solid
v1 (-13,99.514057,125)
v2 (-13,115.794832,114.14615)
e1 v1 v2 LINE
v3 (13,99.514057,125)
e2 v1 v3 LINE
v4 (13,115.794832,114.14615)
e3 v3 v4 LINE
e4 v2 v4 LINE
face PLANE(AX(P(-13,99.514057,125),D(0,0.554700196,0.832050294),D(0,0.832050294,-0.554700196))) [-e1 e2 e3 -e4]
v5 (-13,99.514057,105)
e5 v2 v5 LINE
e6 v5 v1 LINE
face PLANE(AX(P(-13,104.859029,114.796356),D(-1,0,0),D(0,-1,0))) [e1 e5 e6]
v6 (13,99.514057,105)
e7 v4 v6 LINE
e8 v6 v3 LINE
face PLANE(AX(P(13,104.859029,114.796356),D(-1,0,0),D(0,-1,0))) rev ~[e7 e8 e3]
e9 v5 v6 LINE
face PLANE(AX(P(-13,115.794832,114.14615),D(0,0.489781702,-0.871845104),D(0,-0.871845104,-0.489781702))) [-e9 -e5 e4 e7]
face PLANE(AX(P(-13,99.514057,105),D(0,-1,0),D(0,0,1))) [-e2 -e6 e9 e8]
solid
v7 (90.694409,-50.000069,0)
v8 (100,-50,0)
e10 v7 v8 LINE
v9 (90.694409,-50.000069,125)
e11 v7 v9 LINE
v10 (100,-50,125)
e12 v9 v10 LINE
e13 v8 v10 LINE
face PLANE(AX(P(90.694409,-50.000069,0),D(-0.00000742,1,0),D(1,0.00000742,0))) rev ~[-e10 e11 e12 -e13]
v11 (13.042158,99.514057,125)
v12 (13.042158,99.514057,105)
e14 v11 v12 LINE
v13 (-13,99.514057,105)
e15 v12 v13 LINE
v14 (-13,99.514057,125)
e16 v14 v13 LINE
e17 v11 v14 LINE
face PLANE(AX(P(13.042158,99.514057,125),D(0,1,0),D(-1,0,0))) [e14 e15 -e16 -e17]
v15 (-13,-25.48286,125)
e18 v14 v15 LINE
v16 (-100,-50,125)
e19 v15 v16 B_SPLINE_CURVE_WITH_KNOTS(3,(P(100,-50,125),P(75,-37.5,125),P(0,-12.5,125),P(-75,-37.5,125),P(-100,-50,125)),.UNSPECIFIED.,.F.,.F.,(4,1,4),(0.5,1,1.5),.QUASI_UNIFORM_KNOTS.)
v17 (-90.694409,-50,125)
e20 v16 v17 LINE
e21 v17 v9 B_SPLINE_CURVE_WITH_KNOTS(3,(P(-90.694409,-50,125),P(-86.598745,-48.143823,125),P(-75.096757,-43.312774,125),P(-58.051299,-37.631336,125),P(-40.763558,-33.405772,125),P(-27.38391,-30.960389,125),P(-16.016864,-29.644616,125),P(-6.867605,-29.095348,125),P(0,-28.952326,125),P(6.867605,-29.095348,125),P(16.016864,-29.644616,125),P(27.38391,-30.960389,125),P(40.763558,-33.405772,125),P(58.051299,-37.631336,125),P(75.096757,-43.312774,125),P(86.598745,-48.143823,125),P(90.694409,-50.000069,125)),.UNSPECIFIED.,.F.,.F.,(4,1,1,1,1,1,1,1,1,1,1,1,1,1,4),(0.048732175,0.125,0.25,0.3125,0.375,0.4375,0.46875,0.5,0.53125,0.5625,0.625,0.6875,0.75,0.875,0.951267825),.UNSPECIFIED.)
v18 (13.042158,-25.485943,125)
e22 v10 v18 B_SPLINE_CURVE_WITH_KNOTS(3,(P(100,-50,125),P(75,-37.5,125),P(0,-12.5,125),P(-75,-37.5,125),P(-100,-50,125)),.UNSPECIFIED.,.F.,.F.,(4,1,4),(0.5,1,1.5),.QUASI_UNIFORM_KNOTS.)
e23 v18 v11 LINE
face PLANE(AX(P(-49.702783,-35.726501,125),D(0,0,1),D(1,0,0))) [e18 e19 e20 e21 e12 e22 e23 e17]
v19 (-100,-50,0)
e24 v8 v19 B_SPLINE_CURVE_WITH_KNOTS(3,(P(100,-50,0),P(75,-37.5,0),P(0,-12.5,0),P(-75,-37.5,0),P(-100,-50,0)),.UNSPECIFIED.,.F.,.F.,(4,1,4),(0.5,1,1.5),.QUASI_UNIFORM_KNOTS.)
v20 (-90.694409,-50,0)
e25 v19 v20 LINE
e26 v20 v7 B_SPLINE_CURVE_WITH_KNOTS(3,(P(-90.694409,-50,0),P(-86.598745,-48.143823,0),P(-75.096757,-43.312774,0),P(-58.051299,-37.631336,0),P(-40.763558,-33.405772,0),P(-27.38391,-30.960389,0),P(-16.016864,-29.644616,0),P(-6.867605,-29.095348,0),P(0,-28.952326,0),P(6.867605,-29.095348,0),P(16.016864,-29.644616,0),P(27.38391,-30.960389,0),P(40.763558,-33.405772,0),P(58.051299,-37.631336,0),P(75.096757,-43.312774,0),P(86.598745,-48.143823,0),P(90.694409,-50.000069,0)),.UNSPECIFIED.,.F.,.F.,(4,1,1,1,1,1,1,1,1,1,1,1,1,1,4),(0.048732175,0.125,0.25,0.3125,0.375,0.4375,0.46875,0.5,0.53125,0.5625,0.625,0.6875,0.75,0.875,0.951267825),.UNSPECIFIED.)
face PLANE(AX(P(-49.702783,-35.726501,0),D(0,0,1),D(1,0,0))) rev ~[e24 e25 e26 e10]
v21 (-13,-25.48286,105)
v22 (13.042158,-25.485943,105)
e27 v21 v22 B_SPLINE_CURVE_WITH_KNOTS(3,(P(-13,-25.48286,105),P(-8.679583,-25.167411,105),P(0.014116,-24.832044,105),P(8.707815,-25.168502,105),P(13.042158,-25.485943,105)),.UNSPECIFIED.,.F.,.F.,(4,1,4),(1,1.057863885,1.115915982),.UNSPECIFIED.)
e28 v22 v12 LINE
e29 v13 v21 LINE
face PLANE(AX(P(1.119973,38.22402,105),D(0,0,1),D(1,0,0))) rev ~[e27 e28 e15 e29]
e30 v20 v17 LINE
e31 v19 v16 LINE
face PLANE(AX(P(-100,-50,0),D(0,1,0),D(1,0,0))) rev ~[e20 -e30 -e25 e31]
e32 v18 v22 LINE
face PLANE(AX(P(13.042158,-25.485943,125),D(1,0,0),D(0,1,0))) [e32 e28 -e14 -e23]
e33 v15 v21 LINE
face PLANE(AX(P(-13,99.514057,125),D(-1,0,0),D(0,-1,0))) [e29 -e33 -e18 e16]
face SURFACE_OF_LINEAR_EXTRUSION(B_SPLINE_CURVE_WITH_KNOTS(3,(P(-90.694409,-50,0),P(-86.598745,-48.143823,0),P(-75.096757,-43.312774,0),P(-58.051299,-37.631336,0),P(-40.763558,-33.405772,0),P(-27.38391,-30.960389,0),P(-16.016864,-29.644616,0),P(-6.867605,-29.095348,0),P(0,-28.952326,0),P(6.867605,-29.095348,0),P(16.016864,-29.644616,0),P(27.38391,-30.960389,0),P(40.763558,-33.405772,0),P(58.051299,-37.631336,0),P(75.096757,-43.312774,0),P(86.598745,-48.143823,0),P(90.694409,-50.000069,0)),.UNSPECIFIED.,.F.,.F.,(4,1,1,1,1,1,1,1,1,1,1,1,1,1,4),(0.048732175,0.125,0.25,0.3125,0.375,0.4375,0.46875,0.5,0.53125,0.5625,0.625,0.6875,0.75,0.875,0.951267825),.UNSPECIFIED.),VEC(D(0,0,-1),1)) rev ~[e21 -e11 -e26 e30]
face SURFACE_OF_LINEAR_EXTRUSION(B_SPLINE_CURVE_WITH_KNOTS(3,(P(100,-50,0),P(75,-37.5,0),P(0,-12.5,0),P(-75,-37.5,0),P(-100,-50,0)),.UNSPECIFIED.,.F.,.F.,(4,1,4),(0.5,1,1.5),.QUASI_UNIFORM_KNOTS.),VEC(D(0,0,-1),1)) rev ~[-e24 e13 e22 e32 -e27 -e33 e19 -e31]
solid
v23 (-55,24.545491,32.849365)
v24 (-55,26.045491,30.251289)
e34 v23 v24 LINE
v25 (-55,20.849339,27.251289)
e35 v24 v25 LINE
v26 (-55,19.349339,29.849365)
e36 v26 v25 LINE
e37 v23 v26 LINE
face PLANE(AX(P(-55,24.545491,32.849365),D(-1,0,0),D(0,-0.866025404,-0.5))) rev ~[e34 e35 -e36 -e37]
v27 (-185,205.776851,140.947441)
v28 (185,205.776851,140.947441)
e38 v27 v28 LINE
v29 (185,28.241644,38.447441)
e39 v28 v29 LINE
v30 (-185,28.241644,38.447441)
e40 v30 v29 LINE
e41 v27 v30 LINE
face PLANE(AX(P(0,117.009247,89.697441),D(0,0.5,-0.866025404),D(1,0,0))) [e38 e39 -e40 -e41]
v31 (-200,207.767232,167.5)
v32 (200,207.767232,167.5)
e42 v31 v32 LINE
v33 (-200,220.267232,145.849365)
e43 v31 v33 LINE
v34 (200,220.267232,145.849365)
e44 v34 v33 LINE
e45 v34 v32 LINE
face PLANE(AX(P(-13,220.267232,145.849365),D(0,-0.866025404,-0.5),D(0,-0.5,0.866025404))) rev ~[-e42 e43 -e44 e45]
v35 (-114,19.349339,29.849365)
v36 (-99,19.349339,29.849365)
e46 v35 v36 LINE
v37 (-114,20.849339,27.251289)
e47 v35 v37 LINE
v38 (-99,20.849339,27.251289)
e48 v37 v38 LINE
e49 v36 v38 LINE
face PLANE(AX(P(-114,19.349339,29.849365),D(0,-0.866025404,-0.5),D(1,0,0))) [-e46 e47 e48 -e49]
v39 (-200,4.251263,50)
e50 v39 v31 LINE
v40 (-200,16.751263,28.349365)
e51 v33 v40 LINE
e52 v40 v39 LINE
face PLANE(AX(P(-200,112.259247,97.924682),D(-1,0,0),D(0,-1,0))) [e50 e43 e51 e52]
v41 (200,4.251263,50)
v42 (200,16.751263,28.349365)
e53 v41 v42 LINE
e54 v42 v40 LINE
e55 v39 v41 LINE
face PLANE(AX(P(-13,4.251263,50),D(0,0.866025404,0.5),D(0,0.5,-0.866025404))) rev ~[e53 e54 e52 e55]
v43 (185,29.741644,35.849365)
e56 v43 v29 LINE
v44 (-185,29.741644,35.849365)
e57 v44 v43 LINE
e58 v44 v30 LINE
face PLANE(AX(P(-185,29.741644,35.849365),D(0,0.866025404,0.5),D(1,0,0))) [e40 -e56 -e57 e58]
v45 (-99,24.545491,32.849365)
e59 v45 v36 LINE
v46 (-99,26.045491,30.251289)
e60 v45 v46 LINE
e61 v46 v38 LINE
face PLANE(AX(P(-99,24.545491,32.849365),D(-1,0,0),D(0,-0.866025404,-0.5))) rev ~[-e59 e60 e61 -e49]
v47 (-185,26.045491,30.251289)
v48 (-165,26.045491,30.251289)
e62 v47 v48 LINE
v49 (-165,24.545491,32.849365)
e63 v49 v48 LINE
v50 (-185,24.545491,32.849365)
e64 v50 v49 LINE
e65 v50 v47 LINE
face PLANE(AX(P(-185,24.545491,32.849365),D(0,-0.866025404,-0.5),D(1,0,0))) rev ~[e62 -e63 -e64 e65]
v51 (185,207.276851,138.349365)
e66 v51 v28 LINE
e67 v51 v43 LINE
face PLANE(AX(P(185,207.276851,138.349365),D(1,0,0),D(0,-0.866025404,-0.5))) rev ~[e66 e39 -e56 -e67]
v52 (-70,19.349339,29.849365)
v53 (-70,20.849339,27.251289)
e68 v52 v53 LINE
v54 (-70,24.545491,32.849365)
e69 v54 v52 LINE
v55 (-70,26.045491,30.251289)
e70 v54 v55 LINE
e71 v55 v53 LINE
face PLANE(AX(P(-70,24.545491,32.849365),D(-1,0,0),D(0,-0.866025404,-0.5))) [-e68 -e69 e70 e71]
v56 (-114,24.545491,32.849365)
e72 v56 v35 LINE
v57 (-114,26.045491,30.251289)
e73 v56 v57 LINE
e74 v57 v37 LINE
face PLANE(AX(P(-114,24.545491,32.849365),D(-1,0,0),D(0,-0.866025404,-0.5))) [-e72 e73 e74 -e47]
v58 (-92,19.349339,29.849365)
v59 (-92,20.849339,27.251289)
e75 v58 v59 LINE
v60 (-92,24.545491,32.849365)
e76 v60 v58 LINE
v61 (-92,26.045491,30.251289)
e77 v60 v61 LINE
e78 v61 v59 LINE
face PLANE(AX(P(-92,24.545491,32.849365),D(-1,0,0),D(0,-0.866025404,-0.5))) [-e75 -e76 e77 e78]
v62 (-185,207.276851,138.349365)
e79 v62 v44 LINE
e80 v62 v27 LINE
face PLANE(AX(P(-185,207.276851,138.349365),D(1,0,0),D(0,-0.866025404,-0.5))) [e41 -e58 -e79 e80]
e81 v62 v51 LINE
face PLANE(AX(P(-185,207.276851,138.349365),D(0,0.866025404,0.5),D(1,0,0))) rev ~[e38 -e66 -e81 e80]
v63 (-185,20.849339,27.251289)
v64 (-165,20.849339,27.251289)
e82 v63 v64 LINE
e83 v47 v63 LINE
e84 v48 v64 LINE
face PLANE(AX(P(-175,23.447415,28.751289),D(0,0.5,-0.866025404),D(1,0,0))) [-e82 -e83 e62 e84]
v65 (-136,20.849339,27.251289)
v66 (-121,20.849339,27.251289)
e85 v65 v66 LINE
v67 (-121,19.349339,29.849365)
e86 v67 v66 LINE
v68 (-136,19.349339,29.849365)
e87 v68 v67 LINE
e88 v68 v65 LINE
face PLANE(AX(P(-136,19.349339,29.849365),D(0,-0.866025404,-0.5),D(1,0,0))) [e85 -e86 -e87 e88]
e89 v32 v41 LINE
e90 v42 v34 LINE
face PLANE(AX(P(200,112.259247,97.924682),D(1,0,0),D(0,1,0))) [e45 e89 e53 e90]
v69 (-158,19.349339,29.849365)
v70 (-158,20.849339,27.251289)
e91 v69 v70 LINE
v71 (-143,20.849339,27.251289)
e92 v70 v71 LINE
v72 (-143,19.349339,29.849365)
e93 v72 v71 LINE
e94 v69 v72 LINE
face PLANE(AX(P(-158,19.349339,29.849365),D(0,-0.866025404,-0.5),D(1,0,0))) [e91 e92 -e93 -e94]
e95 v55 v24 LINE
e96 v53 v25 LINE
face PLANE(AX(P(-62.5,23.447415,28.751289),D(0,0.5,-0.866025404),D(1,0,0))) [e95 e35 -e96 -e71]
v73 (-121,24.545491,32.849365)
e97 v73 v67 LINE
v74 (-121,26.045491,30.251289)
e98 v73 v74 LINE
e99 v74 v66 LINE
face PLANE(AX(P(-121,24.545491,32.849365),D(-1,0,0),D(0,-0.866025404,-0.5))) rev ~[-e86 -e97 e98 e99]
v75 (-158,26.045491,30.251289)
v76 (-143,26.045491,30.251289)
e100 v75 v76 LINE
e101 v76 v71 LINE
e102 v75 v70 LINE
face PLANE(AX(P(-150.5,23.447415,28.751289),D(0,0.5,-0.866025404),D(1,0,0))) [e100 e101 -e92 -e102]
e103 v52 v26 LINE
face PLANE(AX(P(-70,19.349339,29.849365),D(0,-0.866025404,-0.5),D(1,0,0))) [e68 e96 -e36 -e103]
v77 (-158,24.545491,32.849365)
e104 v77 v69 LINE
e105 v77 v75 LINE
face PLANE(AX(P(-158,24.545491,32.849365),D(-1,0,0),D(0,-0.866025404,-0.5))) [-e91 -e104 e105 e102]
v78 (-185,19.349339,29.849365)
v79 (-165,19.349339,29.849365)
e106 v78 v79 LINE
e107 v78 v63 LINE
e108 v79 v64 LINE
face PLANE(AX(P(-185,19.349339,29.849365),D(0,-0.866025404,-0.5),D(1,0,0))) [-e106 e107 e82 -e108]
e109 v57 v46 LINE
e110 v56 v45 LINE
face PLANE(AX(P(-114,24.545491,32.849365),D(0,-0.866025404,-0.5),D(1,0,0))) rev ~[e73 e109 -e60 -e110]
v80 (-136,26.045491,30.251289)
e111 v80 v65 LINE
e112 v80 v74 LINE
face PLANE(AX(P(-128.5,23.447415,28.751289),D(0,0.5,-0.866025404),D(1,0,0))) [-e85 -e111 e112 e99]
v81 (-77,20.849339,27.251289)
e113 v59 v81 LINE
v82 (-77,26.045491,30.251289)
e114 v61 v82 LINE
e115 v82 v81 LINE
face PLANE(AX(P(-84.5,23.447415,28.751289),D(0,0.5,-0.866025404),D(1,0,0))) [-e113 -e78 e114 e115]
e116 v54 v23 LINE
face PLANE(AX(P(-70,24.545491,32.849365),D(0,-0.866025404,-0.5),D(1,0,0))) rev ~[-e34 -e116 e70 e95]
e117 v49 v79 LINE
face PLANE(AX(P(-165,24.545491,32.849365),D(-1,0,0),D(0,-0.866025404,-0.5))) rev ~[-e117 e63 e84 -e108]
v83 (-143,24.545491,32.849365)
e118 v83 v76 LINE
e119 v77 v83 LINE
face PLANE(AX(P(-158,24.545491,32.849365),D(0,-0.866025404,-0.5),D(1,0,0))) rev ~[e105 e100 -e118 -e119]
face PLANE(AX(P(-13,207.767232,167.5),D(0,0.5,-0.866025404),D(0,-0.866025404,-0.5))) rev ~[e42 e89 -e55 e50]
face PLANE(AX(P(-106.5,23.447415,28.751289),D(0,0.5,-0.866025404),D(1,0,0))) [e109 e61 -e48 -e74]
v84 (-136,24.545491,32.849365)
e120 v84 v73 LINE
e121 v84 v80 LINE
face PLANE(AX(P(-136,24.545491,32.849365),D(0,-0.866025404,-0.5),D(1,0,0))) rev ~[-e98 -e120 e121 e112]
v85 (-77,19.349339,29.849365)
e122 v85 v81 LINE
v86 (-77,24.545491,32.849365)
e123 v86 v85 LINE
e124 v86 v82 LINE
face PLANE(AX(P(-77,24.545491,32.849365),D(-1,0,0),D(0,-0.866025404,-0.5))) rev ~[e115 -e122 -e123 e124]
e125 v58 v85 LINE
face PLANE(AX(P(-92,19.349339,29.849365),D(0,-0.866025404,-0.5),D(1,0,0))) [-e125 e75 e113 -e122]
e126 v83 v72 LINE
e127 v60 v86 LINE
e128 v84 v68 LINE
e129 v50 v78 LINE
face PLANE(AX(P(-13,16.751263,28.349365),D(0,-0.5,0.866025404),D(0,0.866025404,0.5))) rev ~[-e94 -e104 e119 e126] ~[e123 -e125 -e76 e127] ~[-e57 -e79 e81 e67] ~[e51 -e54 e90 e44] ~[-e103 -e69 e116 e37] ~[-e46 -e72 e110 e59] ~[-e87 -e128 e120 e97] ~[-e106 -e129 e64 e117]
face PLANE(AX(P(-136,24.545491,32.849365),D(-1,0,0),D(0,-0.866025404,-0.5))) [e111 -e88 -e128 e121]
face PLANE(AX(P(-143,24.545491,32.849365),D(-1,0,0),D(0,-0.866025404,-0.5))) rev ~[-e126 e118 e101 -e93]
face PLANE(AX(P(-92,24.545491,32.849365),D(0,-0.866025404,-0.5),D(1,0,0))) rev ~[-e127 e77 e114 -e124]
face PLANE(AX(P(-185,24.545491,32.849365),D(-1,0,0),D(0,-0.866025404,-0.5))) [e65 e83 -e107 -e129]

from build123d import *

# Parameters (mm, degrees)
F1_DEPTH  = 125
F3_DEPTH  = 20
F5_DEPTH  = 187
F7_DEPTH  = 213
F8_W      = 370
F8_H      = 205
F9_DEPTH  = 3
F10_W     = 15
F10_H     = 6
F10_W_2   = 20
F11_DEPTH = 3
F13_DEPTH = 26


# Not quite as in the source:
# - ends of sketch curves that miss each other by under 0.0002 mm in the source are joined
# - the dataset's text gives a spline's control points without its knots; the knots are read off the source's solid


with BuildPart() as f1:
    # F0 (on Top) → F1 (new body)
    with BuildSketch(Plane.XY):
        with BuildLine():
            Line((0, -29), (0, -25))
            add(Edge.make_bspline(
                [(-100, -50), (-75, -37.5), (-37.5, -25), (0, -25)],
                knots=[0, 0, 0, 0, 0.5, 0.5, 0.5, 0.5], degree=3))
            Line((-100, -50), (-90.6944093778, -50))
            add(Edge.make_bspline(
                [(-90.6944093778, -50), (-86.5987449165, -48.1438234757), (-75.0967566586, -43.3127738232), (-58.0512990615, -37.6313364396), (-40.7635580102, -33.4057717813), (-27.3839101667, -30.9603889359), (-16.0168642352, -29.6446162761), (-6.8676046006, -29.0953479652), (-2.2892015335, -29), (0, -29)],
                knots=[0.0487321749, 0.0487321749, 0.0487321749, 0.0487321749, 0.125, 0.25, 0.3125, 0.375, 0.4375, 0.46875, 0.5, 0.5, 0.5, 0.5], degree=3))
        make_face()
        with BuildLine():
            add(Edge.make_bspline(
                [(0, -25), (37.5, -25), (75, -37.5), (100, -50)],
                knots=[0.5, 0.5, 0.5, 0.5, 1, 1, 1, 1], degree=3))
            Line((0, -25), (0, -29))
            add(Edge.make_bspline(
                [(0, -29), (2.2892015335, -29), (6.8676046006, -29.0953479652), (16.0168642352, -29.6446162761), (27.3839101667, -30.9603889359), (40.7635580102, -33.4057717813), (58.0512990615, -37.6313364396), (75.0967566586, -43.3127738232), (86.5987449165, -48.1438234757), (90.6944093778, -50.0000690471)],
                knots=[0.5, 0.5, 0.5, 0.5, 0.53125, 0.5625, 0.625, 0.6875, 0.75, 0.875, 0.9512678251, 0.9512678251, 0.9512678251, 0.9512678251], degree=3))
            Line((90.6944093778, -50.0000690471), (100, -50))
        make_face()
    extrude(amount=F1_DEPTH)

    # F2 (on face) → F3 (join)
    with BuildSketch(Plane.XY.offset(125)):
        with BuildLine():
            Line((-13, 0), (0, 0))
            Line((0, 0), (0, -25))
            add(Edge.make_bspline(
                [(13.0421580745, -25.4859430767), (8.7078145989, -25.1685023002), (4.3539072994, -25), (0, -25)],
                knots=[0.9419479027, 0.9419479027, 0.9419479027, 0.9419479027, 1, 1, 1, 1], degree=3))
            Line((13.0421580745, -25.4859430767), (13.0421580745, 0.5756272936))
            Line((13.0421580745, 0.5756272936), (13.0421580745, 99.5140569233))
            Line((13.0421580745, 99.5140569233), (-13, 99.5140569233))
            Line((-13, 99.5140569233), (-13, 0))
        make_face()
        with BuildLine():
            Line((0, -25), (0, 0))
            Line((0, 0), (-13, 0))
            Line((-13, 0), (-13, -25.4828602254))
            add(Edge.make_bspline(
                [(0, -25), (-4.339791385, -25), (-8.67958277, -25.1674114601), (-13, -25.4828602254)],
                knots=[1, 1, 1, 1, 1.0578638851, 1.0578638851, 1.0578638851, 1.0578638851], degree=3))
        make_face()
    extrude(amount=-F3_DEPTH)


with BuildPart() as f5:
    # F4 (on face) → F5 (new body)
    with BuildSketch(Plane(origin=(-13, 0, 0), x_dir=(0, -1, 0), z_dir=(-1, 0, 0))):
        Polygon((-4.251262507, 50), (-99.5140569233, 105), (-207.7672323963, 167.5), (-220.2672323963, 145.8493649054), (-16.751262507, 28.3493649054), align=None)
    extrude(amount=F5_DEPTH)

    # F6 (on face) → F7 (join)
    with BuildSketch(Plane.YZ.offset(-13)):
        Polygon((220.2672323963, 145.8493649054), (207.7672323963, 167.5), (4.251262507, 50), (16.751262507, 28.3493649054), align=None)
    extrude(amount=F7_DEPTH)

    # F8 (on face) → F9 (cut)
    with BuildSketch(Plane(origin=(0, -8.0878194679, 14.0085142408), x_dir=(1, 0, 0), z_dir=(0, 0.5, -0.8660254038))):
        with Locations((0, -146.1817013292)):
            Rectangle(F8_W, F8_H)
    extrude(amount=-F9_DEPTH, mode=Mode.SUBTRACT)

    # F10 (on face) → F11 (join)
    with BuildSketch(Plane(origin=(0, -8.0878194679, 14.0085142408), x_dir=(1, 0, 0), z_dir=(0, 0.5, -0.8660254038))):
        with Locations((-62.5, -34.6817013292)):
            Rectangle(F10_W, F10_H)
        with Locations((-84.5, -34.6817013292)):
            Rectangle(F10_W, F10_H)
        with Locations((-106.5, -34.6817013292)):
            Rectangle(F10_W, F10_H)
        with Locations((-128.5, -34.6817013292)):
            Rectangle(F10_W, F10_H)
        with Locations((-150.5, -34.6817013292)):
            Rectangle(F10_W, F10_H)
        with Locations((-175, -34.6817013292)):
            Rectangle(F10_W_2, F10_H)
    extrude(amount=F11_DEPTH)


with BuildPart() as f13:
    # F12 (on face) → F13 (new body)
    with BuildSketch(Plane(origin=(-13, 0, 0), x_dir=(0, -1, 0), z_dir=(-1, 0, 0))):
        Polygon((-99.5140569233, 105), (-99.5140569233, 125), (-115.7948323081, 114.1461497434), align=None)
    extrude(amount=-F13_DEPTH)


solid = Compound([f1.part, f5.part, f13.part])
